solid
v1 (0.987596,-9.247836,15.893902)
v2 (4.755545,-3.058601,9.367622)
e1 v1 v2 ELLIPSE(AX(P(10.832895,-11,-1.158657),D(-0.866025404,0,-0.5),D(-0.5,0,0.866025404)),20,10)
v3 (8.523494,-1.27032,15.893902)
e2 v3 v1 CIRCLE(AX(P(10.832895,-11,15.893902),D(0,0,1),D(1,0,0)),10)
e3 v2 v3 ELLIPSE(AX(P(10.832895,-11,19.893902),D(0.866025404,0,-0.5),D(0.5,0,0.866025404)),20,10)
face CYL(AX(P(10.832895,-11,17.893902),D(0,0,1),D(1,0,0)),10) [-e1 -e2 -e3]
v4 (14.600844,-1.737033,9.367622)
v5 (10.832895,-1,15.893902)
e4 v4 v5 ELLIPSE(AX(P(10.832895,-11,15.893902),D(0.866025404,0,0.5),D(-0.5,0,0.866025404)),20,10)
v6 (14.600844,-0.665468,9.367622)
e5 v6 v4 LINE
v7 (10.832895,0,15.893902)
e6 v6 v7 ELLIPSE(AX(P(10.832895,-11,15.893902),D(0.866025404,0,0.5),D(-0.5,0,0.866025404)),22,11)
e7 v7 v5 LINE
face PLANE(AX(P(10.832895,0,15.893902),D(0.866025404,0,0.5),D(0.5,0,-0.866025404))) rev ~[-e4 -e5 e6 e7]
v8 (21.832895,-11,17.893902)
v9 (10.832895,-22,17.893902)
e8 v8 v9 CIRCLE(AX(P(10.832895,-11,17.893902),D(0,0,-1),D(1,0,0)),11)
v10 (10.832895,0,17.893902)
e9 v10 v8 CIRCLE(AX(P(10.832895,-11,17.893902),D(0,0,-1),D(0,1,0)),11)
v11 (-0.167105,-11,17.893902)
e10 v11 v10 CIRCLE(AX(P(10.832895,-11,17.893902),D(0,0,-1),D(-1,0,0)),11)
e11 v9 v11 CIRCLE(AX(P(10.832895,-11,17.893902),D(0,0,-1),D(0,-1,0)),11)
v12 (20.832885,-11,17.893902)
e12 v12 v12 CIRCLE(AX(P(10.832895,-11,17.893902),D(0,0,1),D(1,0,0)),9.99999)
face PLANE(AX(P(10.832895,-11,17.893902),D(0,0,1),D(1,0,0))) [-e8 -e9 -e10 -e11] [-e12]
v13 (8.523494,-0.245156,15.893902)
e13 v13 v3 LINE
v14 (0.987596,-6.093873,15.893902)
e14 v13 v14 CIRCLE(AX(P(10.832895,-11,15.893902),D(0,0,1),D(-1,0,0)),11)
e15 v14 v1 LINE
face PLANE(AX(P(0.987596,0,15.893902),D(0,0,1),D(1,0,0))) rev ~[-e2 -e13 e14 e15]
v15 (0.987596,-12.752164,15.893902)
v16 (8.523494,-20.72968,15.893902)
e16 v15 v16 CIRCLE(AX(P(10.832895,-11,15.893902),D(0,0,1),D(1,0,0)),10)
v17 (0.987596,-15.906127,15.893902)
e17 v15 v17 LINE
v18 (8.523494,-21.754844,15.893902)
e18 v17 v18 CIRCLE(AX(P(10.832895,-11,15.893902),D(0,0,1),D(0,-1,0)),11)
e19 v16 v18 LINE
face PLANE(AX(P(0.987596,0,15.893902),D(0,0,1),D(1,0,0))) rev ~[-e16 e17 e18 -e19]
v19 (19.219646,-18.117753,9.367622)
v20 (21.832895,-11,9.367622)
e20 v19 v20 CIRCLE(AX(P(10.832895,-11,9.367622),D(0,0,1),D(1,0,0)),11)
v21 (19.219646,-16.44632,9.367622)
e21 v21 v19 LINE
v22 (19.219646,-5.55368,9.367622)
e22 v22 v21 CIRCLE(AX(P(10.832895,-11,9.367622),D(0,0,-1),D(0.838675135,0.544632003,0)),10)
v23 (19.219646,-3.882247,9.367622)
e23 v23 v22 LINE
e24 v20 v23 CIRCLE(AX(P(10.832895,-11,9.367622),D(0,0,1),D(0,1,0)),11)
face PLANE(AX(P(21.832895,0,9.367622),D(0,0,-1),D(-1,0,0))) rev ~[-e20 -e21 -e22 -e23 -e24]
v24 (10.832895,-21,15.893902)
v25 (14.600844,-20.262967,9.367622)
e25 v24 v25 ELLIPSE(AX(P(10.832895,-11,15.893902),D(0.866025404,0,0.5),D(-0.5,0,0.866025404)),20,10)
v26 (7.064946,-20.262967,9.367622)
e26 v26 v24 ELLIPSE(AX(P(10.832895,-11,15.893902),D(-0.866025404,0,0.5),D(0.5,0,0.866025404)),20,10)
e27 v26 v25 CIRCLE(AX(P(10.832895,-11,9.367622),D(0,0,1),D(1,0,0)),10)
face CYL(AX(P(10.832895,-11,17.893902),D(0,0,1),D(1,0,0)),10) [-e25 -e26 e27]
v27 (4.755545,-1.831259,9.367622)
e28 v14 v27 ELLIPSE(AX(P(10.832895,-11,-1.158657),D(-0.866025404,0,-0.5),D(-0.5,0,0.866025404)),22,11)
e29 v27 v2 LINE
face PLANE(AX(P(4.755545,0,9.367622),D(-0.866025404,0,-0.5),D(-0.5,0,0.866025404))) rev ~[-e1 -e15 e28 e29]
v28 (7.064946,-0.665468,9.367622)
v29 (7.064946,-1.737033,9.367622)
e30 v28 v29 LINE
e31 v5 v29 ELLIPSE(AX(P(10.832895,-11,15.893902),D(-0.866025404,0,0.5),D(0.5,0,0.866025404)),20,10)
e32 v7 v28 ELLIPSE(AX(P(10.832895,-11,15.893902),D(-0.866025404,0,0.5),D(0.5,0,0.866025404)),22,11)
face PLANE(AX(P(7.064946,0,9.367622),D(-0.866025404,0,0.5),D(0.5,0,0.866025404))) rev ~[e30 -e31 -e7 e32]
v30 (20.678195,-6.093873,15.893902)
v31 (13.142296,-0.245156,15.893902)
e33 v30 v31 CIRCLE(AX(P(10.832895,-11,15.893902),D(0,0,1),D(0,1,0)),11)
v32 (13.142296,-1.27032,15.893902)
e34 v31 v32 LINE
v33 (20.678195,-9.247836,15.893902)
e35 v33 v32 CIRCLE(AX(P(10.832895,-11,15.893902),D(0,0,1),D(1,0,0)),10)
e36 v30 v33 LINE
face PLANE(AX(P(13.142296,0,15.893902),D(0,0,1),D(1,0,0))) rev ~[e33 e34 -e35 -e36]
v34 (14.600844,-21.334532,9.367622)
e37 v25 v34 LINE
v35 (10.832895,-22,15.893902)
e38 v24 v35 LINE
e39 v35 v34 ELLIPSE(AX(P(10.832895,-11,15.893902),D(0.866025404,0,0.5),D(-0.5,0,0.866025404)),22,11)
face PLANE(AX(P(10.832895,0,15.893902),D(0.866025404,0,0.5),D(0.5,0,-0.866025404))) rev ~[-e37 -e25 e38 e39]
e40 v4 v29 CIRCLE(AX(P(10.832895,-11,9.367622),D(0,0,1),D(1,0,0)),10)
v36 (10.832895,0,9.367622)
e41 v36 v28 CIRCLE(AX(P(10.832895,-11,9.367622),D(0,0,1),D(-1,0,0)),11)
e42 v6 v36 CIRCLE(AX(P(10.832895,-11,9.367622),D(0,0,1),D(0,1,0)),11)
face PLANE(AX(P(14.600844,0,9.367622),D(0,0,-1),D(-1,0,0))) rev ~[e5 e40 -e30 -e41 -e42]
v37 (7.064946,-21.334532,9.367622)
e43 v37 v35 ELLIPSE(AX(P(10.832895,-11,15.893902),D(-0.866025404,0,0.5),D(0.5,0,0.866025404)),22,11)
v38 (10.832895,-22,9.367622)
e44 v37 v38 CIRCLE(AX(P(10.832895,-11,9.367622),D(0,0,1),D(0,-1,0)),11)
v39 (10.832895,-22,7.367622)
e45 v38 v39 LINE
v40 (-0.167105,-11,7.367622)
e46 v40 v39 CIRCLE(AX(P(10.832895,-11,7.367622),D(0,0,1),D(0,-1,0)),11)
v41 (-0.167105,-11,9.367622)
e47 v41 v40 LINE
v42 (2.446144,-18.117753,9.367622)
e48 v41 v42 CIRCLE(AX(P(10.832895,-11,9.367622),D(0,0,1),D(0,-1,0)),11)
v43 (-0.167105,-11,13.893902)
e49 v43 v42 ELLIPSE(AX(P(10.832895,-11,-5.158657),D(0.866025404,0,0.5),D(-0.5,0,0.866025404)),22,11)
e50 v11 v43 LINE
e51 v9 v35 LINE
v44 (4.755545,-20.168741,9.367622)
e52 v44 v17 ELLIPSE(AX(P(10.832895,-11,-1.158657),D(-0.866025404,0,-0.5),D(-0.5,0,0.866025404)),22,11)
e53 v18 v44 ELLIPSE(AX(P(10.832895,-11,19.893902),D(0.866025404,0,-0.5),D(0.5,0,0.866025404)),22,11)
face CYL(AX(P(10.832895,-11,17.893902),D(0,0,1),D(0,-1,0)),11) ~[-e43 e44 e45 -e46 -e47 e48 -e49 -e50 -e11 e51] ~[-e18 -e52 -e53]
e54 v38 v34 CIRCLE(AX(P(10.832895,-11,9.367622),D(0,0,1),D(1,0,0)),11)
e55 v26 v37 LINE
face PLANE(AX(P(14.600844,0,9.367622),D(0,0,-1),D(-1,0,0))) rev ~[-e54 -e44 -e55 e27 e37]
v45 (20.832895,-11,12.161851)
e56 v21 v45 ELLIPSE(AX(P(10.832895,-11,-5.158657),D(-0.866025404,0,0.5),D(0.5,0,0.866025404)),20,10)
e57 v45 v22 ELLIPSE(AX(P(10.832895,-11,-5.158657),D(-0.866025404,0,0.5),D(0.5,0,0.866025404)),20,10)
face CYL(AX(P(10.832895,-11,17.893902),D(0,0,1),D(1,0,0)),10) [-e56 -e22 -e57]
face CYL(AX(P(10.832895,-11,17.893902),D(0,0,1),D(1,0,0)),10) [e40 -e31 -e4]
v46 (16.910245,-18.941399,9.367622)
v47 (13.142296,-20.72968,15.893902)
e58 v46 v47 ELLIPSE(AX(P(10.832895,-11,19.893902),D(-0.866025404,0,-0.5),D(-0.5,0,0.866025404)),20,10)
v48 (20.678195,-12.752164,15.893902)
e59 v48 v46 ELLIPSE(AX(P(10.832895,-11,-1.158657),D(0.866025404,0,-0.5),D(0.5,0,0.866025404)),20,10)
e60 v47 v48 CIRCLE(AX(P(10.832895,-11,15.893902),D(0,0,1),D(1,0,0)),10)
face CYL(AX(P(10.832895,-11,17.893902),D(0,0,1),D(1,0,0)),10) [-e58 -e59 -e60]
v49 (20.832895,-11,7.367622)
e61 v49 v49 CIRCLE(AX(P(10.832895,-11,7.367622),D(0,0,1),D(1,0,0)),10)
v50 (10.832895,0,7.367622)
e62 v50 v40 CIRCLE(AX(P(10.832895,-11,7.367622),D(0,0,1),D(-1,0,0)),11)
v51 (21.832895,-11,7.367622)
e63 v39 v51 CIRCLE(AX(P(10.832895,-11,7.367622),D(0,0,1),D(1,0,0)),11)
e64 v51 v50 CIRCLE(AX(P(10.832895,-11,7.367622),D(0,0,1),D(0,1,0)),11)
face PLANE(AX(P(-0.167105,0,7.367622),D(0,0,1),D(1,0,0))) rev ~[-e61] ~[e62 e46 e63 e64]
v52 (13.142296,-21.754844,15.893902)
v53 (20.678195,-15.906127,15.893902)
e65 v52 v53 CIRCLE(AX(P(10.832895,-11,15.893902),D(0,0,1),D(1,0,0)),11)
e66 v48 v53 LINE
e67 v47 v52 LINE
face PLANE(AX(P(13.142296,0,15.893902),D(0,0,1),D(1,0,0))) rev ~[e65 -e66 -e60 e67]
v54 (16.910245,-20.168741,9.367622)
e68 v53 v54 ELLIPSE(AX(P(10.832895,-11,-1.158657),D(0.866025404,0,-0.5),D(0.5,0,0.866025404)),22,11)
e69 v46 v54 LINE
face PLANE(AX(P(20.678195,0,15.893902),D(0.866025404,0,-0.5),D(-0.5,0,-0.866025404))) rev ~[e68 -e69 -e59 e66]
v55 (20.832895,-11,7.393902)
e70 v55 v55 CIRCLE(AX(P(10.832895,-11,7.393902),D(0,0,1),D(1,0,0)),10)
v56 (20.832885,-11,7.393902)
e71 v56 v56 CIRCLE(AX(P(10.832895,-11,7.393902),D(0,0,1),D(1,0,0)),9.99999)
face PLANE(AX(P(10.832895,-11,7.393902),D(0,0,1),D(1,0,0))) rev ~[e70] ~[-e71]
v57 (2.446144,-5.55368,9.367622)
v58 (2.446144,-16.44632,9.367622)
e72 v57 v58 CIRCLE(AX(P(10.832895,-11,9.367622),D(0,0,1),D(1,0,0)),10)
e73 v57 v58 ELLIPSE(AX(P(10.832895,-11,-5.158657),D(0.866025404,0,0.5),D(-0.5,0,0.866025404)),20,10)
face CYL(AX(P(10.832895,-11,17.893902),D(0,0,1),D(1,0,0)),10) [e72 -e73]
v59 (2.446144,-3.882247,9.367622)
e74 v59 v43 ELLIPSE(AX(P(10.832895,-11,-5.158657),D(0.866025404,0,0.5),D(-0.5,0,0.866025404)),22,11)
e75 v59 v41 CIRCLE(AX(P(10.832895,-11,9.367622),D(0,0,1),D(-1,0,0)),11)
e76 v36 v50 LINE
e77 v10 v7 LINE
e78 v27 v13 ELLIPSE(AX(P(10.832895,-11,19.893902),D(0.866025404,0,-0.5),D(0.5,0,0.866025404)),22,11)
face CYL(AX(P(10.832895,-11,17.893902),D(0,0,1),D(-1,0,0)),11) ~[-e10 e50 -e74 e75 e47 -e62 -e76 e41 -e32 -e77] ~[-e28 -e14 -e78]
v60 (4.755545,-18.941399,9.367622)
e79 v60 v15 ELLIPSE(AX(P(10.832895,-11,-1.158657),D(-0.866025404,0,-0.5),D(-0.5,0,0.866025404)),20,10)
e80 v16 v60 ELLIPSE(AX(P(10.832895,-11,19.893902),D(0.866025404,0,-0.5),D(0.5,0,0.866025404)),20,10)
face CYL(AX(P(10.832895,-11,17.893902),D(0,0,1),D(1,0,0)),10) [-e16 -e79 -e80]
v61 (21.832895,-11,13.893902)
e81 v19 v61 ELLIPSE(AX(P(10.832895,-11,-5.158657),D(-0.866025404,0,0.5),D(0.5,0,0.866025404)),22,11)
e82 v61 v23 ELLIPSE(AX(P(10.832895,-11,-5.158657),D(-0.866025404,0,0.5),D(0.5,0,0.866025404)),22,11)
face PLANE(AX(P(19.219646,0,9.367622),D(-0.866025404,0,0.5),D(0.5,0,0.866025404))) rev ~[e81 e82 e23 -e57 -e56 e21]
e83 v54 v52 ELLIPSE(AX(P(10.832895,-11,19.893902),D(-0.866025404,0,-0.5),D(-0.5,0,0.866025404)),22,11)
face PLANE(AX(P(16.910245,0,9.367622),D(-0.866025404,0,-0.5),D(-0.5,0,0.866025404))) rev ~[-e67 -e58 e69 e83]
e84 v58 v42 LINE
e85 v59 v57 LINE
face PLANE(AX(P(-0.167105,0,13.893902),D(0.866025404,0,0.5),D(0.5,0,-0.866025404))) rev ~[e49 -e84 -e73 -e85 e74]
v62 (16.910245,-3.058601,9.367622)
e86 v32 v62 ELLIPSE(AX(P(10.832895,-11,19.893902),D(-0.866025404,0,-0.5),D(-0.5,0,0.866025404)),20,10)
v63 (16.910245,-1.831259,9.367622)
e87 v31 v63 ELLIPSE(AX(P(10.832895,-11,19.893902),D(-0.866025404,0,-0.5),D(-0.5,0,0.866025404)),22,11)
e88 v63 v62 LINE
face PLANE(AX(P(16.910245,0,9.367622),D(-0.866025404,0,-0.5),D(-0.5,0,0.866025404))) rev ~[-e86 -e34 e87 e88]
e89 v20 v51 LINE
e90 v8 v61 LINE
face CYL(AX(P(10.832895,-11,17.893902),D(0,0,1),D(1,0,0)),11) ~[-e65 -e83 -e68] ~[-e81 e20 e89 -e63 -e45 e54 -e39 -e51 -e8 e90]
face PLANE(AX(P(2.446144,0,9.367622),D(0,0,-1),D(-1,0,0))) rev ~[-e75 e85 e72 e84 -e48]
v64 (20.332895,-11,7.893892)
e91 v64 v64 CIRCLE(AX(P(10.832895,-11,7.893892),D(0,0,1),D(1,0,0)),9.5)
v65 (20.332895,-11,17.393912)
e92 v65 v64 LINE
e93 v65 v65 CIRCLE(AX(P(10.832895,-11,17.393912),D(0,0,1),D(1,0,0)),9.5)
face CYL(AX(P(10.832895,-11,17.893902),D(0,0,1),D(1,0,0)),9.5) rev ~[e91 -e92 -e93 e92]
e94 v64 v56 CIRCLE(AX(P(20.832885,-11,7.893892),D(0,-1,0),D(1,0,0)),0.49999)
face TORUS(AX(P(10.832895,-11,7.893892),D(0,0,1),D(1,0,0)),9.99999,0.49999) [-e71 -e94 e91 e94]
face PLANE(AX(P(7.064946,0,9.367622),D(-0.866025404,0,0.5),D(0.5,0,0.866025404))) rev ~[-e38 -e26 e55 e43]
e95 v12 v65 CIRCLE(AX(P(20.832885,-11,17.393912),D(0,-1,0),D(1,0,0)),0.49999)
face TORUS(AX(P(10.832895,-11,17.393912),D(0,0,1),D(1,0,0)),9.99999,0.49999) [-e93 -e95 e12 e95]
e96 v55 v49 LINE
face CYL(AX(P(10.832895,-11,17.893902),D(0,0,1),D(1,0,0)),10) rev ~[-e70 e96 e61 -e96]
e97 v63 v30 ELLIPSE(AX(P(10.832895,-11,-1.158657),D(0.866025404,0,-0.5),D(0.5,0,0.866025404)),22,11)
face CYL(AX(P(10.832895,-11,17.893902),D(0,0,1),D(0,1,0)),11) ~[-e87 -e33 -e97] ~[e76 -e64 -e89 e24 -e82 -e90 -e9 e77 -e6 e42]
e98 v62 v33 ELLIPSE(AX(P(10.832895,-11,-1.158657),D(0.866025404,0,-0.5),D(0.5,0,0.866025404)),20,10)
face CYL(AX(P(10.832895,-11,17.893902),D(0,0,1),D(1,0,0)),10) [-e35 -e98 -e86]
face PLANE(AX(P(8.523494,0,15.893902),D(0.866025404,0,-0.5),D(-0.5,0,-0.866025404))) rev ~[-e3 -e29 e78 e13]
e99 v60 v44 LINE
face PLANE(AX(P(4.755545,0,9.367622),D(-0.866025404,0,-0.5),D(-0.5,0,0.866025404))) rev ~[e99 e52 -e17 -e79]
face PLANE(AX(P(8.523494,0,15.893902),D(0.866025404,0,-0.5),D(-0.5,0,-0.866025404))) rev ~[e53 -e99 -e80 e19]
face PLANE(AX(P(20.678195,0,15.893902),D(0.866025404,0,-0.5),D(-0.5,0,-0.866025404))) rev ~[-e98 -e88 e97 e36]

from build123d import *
from build123d import SkipClean  # not in build123d's __all__

# Parameters (mm, degrees)
F1_DEPTH = 22
F2_R     = 10
F2_R_2   = 9.5
F3_DEPTH = 25
F4_DEPTH = 10.5
F5_R     = 0.49999


# Not quite as in the source:
# - a fillet or chamfer is up to 0.001 mm smaller than in the source, because OpenCascade refuses the exact size


with BuildPart() as f1:
    # F0 (on Front) → F1 (new body)
    with BuildSketch(Plane.XZ):
        Polygon((-0.1671048567, 13.8939016994), (2.4461437974, 9.3676222578), (4.7555448741, 9.3676222578), (0.9875956817, 15.8939016994), (-0.1671048567, 15.8939016994), align=None)
        Polygon((0.9875956817, 15.8939016994), (8.5234940666, 15.8939016994), (9.678194605, 17.8939016994), (-0.1671048567, 17.8939016994), align=None)
        Polygon((9.678194605, 17.8939016994), (8.5234940666, 15.8939016994), (10.8328951433, 15.8939016994), align=None)
        Polygon((9.678194605, 17.8939016994), (10.8328951433, 15.8939016994), (11.9875956817, 17.8939016994), align=None)
        Polygon((11.9875956817, 17.8939016994), (10.8328951433, 15.8939016994), (13.1422962201, 15.8939016994), align=None)
        Polygon((-0.1671048567, 15.8939016994), (0.9875956817, 15.8939016994), (-0.1671048567, 17.8939016994), align=None)
        Polygon((13.1422962201, 15.8939016994), (20.678194605, 15.8939016994), (21.8328951433, 17.8939016994), (11.9875956817, 17.8939016994), align=None)
        Polygon((21.8328951433, 17.8939016994), (20.678194605, 15.8939016994), (21.8328951433, 15.8939016994), align=None)
        Polygon((20.678194605, 15.8939016994), (16.9102454125, 9.3676222578), (19.2196464893, 9.3676222578), (21.8328951433, 13.8939016994), (21.8328951433, 15.8939016994), align=None)
        Polygon((10.8328951433, 15.8939016994), (14.6008443358, 9.3676222578), (16.9102454125, 9.3676222578), (13.1422962201, 15.8939016994), align=None)
        Polygon((8.5234940666, 15.8939016994), (4.7555448741, 9.3676222578), (7.0649459509, 9.3676222578), (10.8328951433, 15.8939016994), align=None)
        Polygon((4.7555448741, 9.3676222578), (3.6008443358, 7.3676222578), (5.9102454125, 7.3676222578), align=None)
        Polygon((2.4461437974, 9.3676222578), (3.6008443358, 7.3676222578), (4.7555448741, 9.3676222578), align=None)
        Polygon((-0.1671048567, 9.3676222578), (-0.1671048567, 7.3676222578), (3.6008443358, 7.3676222578), (2.4461437974, 9.3676222578), align=None)
        Polygon((4.7555448741, 9.3676222578), (5.9102454125, 7.3676222578), (7.0649459509, 9.3676222578), align=None)
        Polygon((7.0649459509, 9.3676222578), (5.9102454125, 7.3676222578), (15.7555448741, 7.3676222578), (14.6008443358, 9.3676222578), align=None)
        Polygon((14.6008443358, 9.3676222578), (15.7555448741, 7.3676222578), (16.9102454125, 9.3676222578), align=None)
        Polygon((16.9102454125, 9.3676222578), (15.7555448741, 7.3676222578), (18.0649459509, 7.3676222578), align=None)
        Polygon((16.9102454125, 9.3676222578), (18.0649459509, 7.3676222578), (19.2196464893, 9.3676222578), align=None)
        Polygon((19.2196464893, 9.3676222578), (18.0649459509, 7.3676222578), (21.8328951433, 7.3676222578), (21.8328951433, 9.3676222578), align=None)
    extrude(amount=F1_DEPTH)

    # F2 (on face) → F3 (cut)
    with BuildSketch(Plane.XY.offset(17.8939016994)):
        with Locations((10.8328951433, -11)):
            Circle(F2_R)
        with Locations((10.8328951433, -11)):
            Circle(F2_R_2, mode=Mode.SUBTRACT)
        with Locations((10.8328951433, -11)):
            Circle(F2_R_2)
        with BuildLine():
            ThreePointArc((-0.1671048567, -11), (3.0547205503, -3.2218254069), (10.8328951433, 0))
            Line((10.8328951433, 0), (-0.1671048567, 0))
            Line((-0.1671048567, 0), (-0.1671048567, -11))
        make_face()
        with BuildLine():
            ThreePointArc((10.8328951433, 0), (18.6110697364, -3.2218254069), (21.8328951433, -11))
            Line((21.8328951433, -11), (21.8328951433, 0))
            Line((21.8328951433, 0), (10.8328951433, 0))
        make_face()
        with BuildLine():
            Line((21.8328951433, -22), (21.8328951433, -11))
            ThreePointArc((21.8328951433, -11), (18.6110697364, -18.7781745931), (10.8328951433, -22))
            Line((10.8328951433, -22), (21.8328951433, -22))
        make_face()
        with BuildLine():
            Line((-0.1671048567, -22), (10.8328951433, -22))
            ThreePointArc((10.8328951433, -22), (3.0547205503, -18.7781745931), (-0.1671048567, -11))
            Line((-0.1671048567, -11), (-0.1671048567, -22))
        make_face()
    with SkipClean():  # cleaning this boolean's faces spoils the solid; the shape is the same uncleaned
        extrude(amount=-F3_DEPTH, mode=Mode.SUBTRACT)

    # F2 (on face) → F4 (join)
    with BuildSketch(Plane.XY.offset(17.8939016994)):
        with Locations((10.8328951433, -11)):
            Circle(F2_R)
        with Locations((10.8328951433, -11)):
            Circle(F2_R_2, mode=Mode.SUBTRACT)
    with SkipClean():  # cleaning this boolean's faces spoils the solid; the shape is the same uncleaned
        extrude(amount=-F4_DEPTH)

    # F5 (radius 0.5 in the source; OpenCascade refuses exactly that, so slightly less here)
    f5_edges = [f1.edges().sort_by_distance(p)[0] for p in [
        (1.332895, -11, 7.393902),
        (1.332895, -11, 17.893902),
    ]]
    fillet(f5_edges, radius=F5_R)


solid = f1.part
